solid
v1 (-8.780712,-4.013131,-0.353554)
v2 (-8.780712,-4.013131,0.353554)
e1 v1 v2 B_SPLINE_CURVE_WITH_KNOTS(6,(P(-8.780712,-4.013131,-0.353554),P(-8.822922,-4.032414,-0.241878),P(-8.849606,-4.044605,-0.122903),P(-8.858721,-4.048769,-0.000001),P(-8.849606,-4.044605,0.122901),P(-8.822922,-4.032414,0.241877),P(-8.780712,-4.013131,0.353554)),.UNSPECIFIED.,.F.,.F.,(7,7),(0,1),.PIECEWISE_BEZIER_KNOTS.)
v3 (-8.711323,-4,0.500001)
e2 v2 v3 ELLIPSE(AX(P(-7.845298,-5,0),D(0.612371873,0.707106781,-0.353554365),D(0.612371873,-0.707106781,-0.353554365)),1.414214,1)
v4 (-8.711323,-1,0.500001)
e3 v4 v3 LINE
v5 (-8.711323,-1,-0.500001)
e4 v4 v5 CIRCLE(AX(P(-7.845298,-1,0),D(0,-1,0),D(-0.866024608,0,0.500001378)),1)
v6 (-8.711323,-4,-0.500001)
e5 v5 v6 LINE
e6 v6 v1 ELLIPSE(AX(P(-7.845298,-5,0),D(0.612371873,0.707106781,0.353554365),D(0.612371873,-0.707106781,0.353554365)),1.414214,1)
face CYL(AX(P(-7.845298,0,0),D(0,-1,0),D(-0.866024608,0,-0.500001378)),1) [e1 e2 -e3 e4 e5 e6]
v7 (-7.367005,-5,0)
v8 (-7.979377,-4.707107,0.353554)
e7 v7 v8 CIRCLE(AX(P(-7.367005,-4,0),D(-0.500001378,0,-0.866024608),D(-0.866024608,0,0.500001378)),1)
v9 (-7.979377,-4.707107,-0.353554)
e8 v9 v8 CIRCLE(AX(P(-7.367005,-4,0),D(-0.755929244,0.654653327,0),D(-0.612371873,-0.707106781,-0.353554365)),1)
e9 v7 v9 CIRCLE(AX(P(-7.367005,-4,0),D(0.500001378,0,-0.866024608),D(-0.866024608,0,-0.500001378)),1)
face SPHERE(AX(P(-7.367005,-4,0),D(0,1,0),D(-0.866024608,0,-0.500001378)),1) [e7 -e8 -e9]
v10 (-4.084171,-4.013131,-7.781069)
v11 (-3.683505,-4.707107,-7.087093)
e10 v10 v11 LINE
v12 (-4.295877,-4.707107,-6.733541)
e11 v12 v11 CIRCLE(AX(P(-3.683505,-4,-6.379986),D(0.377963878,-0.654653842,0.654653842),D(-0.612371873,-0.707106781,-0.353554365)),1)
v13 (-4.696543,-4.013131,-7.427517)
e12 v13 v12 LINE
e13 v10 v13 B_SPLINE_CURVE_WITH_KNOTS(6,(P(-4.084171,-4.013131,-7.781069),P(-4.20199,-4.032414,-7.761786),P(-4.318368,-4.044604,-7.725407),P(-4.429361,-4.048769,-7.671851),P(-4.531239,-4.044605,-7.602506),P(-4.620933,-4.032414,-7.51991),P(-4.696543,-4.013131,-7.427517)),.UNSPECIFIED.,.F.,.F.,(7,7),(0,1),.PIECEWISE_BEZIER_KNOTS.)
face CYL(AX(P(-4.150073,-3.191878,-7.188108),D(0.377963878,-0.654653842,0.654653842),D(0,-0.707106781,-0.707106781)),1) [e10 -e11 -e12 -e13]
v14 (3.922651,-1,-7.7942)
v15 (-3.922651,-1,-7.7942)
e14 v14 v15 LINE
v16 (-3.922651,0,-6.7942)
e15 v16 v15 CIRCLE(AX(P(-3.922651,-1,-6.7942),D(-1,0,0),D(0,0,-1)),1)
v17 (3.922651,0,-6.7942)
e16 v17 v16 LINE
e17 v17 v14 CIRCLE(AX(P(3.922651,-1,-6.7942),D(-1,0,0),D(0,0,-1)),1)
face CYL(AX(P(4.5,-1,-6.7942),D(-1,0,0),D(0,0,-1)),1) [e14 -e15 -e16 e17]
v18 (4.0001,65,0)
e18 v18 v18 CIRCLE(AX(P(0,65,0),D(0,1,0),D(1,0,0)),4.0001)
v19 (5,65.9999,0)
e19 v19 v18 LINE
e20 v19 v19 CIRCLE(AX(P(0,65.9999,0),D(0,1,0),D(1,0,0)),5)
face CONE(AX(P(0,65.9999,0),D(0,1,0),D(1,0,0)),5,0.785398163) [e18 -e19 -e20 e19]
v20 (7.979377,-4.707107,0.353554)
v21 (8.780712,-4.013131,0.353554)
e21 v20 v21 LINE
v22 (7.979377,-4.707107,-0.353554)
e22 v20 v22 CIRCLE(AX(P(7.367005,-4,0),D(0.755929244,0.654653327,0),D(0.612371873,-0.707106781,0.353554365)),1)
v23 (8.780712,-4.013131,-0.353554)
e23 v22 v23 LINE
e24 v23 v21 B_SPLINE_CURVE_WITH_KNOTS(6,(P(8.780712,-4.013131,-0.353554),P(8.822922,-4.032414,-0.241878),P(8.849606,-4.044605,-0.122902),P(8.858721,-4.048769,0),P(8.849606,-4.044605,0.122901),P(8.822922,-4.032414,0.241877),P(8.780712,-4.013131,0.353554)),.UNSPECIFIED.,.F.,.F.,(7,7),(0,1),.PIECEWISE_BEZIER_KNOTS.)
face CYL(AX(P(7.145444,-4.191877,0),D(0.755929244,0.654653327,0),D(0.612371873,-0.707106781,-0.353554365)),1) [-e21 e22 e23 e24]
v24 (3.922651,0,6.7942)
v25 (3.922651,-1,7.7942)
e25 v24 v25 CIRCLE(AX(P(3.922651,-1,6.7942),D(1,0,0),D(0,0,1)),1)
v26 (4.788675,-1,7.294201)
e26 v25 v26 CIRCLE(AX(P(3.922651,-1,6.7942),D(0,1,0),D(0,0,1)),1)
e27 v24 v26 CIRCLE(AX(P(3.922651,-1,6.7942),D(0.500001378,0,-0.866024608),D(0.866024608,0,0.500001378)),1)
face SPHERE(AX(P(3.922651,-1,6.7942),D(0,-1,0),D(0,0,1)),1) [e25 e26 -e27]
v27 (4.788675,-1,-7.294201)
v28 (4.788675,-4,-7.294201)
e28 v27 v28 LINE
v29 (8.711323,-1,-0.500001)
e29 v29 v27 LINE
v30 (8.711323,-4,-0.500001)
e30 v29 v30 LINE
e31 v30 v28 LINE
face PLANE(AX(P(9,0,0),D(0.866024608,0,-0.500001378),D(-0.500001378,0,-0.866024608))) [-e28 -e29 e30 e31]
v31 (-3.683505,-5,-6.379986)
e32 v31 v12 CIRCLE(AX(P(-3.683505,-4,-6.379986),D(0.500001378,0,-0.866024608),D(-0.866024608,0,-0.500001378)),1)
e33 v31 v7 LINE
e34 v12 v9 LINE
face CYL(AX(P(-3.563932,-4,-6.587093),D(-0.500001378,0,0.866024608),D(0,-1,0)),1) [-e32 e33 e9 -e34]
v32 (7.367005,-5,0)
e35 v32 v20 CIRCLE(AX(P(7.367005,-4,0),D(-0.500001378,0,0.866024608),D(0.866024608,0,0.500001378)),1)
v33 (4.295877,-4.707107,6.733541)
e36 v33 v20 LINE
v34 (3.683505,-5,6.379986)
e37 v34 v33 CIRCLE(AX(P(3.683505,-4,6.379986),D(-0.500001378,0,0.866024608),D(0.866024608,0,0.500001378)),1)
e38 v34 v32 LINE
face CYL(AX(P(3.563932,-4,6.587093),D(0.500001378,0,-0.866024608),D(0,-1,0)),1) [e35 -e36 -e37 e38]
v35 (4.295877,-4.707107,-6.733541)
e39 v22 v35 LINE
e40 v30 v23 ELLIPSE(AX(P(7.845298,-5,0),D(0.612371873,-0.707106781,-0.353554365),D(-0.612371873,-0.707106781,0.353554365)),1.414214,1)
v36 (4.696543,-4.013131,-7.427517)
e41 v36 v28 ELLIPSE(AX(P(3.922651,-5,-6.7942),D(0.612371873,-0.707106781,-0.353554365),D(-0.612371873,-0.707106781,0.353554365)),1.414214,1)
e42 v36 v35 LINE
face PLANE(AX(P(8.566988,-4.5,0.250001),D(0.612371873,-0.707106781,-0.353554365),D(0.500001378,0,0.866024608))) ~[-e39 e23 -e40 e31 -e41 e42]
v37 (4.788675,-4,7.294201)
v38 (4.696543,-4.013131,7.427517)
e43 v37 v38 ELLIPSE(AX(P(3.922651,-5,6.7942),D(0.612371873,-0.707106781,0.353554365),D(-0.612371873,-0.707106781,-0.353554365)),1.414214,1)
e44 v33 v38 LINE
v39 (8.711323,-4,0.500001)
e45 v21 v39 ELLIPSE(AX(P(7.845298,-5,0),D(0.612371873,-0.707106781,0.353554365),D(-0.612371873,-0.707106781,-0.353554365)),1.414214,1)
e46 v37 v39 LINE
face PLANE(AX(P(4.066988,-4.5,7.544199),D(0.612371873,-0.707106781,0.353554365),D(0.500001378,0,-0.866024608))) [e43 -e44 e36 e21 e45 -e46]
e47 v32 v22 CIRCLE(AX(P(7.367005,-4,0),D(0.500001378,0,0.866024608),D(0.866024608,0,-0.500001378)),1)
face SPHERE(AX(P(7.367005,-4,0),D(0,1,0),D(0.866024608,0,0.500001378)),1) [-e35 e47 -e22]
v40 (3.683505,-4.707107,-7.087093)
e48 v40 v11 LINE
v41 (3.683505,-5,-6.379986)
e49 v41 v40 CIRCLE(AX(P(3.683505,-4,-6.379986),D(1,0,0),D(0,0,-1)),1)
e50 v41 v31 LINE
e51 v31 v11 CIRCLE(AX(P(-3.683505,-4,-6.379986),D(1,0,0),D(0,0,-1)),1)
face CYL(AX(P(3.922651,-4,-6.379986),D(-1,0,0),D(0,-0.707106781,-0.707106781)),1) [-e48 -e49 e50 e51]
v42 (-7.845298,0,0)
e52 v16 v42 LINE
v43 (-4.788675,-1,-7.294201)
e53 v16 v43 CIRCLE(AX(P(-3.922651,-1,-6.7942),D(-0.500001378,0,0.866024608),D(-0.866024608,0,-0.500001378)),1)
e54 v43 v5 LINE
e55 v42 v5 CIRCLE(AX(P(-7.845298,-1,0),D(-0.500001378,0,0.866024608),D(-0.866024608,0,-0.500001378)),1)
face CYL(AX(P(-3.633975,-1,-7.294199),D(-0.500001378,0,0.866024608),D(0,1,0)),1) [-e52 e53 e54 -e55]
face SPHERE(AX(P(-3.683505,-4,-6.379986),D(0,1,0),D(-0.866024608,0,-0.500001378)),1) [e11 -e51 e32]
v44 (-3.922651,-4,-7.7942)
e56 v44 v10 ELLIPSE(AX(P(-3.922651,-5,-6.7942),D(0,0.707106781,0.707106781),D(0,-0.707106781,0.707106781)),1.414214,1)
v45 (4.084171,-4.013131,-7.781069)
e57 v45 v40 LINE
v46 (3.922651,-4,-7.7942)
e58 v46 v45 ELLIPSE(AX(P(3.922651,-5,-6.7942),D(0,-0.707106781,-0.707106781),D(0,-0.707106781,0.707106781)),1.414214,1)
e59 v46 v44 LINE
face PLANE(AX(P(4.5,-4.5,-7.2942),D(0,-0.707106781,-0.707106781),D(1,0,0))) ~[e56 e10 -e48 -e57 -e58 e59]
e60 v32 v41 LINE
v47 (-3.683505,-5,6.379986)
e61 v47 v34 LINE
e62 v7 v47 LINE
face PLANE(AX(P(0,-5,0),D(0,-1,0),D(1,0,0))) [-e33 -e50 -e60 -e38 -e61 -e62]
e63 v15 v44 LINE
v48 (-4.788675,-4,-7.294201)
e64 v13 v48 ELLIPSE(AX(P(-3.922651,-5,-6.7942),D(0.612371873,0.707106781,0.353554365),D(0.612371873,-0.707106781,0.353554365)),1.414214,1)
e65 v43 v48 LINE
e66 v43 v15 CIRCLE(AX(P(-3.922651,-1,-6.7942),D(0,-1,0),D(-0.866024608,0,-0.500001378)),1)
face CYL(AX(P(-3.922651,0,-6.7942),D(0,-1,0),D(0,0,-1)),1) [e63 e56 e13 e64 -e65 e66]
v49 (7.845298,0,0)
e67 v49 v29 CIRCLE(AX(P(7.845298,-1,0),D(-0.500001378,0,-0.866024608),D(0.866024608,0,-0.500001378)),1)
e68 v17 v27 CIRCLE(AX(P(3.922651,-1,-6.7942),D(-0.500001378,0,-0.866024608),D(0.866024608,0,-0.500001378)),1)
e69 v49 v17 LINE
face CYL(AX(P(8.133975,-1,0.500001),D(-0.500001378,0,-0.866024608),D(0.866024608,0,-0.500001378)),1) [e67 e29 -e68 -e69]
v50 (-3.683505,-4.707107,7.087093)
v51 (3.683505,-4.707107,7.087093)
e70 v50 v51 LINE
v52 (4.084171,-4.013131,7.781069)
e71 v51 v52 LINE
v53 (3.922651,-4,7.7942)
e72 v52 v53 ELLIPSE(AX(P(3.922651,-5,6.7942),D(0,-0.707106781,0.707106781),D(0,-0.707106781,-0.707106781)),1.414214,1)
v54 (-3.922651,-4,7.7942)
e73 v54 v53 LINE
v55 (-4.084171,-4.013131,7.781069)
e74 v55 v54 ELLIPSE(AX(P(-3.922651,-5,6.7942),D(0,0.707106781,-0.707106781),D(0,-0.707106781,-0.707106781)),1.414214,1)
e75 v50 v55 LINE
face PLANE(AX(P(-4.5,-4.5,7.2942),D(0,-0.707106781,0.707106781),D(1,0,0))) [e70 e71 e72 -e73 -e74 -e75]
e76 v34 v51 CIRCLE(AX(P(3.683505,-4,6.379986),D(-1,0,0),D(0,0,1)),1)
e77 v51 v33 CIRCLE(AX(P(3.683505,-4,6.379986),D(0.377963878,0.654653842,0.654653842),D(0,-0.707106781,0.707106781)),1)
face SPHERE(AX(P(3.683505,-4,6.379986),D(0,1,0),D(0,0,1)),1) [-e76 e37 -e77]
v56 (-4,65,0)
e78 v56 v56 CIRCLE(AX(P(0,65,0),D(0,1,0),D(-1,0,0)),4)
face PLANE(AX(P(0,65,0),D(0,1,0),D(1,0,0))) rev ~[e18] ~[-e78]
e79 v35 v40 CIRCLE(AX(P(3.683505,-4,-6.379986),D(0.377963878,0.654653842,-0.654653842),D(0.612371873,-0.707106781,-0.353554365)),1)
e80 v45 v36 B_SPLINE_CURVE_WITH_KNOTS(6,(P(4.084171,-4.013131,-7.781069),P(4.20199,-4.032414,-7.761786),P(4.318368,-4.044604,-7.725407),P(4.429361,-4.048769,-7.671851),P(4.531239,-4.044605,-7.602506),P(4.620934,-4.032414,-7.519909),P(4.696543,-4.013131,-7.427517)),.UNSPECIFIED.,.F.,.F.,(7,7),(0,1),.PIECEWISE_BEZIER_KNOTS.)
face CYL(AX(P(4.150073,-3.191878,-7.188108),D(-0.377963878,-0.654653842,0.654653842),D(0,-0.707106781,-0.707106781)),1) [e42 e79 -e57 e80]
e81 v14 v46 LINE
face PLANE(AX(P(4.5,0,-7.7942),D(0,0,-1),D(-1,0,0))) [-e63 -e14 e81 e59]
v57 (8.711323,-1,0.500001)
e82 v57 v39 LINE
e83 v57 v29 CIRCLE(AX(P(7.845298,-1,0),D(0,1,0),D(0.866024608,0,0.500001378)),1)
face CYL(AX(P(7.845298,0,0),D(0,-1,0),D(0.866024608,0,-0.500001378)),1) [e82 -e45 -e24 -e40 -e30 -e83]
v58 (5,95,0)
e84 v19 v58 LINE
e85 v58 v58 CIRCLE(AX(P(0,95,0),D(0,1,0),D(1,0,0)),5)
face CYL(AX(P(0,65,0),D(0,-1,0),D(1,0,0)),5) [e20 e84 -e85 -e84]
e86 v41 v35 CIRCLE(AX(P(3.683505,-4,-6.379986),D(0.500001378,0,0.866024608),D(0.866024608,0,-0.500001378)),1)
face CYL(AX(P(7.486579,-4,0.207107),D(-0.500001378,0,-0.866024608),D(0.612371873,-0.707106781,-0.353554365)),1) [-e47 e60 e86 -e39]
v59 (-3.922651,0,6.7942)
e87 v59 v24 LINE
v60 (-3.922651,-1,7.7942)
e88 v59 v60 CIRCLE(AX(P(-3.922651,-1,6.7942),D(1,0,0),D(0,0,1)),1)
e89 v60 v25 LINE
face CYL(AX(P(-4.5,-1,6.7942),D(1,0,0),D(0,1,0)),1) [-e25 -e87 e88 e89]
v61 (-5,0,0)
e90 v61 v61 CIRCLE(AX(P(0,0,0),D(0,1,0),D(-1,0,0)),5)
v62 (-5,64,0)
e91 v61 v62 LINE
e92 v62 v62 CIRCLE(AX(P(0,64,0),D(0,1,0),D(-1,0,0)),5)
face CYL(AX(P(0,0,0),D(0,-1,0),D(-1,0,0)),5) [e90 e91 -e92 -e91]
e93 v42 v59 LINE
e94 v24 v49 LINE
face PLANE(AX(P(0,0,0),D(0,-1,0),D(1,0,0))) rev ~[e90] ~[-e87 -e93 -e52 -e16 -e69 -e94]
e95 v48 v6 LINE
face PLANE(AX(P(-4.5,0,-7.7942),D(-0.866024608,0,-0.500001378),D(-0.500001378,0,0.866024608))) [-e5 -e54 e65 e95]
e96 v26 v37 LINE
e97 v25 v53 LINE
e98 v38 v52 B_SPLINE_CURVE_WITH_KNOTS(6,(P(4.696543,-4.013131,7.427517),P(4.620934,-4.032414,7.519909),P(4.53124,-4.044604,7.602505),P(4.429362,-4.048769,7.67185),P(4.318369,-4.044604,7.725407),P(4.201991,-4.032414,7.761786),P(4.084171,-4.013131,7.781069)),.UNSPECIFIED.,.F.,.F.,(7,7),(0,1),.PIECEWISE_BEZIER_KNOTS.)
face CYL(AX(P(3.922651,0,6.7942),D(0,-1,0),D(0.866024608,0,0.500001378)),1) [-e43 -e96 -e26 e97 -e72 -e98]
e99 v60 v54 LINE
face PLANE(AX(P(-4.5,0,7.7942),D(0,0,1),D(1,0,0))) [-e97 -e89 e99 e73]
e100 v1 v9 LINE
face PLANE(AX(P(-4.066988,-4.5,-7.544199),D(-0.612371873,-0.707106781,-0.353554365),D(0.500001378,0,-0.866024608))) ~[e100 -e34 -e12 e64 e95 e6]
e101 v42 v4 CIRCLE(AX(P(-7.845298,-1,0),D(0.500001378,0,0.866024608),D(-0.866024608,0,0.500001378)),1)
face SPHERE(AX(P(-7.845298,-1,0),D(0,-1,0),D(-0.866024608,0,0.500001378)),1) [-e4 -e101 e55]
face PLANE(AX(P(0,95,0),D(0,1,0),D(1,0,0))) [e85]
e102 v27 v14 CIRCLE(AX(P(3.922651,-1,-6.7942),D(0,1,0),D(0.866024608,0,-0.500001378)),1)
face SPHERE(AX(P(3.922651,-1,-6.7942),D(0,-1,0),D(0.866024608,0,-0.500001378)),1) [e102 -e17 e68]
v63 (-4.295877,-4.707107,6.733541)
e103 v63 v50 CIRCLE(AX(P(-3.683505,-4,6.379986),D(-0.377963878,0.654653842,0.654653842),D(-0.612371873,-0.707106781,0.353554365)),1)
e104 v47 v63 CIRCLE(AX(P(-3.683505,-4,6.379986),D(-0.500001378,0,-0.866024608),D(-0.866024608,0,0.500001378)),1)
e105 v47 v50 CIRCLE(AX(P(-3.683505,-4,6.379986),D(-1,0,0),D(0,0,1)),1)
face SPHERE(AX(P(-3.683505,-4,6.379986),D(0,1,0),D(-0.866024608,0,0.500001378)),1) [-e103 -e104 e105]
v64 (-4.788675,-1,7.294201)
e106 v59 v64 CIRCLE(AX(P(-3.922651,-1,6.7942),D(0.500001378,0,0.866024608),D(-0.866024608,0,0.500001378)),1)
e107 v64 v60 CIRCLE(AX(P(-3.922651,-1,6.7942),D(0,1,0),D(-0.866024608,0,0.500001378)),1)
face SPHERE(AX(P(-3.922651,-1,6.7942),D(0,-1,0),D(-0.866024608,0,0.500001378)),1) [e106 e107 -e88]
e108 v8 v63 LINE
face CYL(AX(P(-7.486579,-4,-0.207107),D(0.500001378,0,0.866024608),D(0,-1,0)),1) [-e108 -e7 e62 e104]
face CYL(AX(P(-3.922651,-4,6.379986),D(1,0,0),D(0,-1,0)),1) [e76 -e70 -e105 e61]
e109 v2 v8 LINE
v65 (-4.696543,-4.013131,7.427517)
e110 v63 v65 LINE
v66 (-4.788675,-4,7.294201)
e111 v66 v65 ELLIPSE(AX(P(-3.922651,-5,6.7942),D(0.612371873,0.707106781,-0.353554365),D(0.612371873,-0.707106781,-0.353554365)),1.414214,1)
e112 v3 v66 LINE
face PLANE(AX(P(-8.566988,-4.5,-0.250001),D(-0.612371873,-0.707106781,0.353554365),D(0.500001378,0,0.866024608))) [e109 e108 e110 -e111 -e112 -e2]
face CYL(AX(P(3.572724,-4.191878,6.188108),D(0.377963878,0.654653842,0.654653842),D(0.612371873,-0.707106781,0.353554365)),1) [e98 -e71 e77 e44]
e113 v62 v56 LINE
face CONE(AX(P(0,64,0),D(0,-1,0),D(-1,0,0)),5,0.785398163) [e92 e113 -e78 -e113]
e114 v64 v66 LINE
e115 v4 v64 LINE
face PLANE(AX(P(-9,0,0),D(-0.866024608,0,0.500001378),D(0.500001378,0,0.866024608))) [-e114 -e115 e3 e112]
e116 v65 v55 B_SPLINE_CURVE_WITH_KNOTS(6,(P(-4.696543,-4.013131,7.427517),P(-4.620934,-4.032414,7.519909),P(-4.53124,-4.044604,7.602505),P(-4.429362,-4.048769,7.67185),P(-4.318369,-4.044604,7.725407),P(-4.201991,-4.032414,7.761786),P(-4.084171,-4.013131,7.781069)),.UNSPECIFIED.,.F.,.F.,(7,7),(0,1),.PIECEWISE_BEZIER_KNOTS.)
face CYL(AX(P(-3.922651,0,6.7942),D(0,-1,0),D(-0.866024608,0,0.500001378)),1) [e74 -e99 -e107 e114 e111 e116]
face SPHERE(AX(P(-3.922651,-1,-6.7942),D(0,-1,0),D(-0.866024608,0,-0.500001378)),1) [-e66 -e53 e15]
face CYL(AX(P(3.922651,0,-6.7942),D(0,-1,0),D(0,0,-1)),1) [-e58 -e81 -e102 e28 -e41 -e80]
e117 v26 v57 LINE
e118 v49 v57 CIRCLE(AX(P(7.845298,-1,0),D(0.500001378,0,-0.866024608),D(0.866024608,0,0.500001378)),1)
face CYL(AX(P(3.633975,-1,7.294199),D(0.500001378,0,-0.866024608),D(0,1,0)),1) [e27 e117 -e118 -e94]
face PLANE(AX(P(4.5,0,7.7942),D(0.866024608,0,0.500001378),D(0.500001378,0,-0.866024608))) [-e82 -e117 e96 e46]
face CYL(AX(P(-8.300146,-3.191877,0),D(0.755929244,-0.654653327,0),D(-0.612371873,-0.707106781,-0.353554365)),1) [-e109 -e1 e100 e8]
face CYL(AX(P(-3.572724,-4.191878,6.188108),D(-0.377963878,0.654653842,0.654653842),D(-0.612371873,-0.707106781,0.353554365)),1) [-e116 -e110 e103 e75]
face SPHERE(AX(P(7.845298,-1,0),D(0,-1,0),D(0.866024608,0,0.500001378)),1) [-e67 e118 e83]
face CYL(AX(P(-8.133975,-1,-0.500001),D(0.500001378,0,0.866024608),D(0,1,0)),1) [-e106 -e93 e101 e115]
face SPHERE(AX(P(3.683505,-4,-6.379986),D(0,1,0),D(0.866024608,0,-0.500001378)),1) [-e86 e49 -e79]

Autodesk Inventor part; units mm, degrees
ref_plane "YZ Plane" through (0, 0, 0) normal (1, 0, 0) x (0, 1, 0)
ref_plane "XZ Plane" through (0, 0, 0) normal (0, 1, 0) x (-1, 0, 0)
ref_plane "XY Plane" through (0, 0, 0) normal (0, 0, 1) x (1, 0, 0)
sketch "Sketch1" plane through (0, 0, 0) normal (0, 1, 0) x (-1, 0, 0)
  circle A0 centre (0, 0) radius 5
  dimension "d0" = 10
extrude "Extrusion1" add sketch "Sketch1" along normal blind 65
sketch "Sketch2" plane through (0, 65, 0) normal (0, 1, 0) x (1, 0, 0)
  circle A0 centre (0, 0) radius 5 projected
  dimension "d38" = 10
chamfer "Chamfer1" distance 1 angle 45 1 edges at (5, 65, 0)
extrude "Extrusion2" add sketch "Sketch2" along normal blind 30
chamfer "Chamfer2" distance 1 angle 45 1 edges at (-5, 65, 0)
sketch "Sketch3" plane through (0, 0, 0) normal (0, -1, 0) x (1, 0, 0)
  line L0 (0, 0) -> (0, 0) construction
  line L1 (4.5, -7.7942) -> (-4.5, -7.7942)
  line L2 (-4.5, -7.7942) -> (-9, 0)
  line L3 (-9, 0) -> (-4.5, 7.7942)
  line L4 (-4.5, 7.7942) -> (4.5, 7.7942)
  line L5 (4.5, 7.7942) -> (9, 0)
  line L6 (9, 0) -> (4.5, -7.7942)
  circle A0 centre (0, 0) radius 5 projected
  line L7 (-4.5, -7.7942) -> (4.5, 7.7942) construction
  line L8 (-4.5, 7.7942) -> (4.5, -7.7942) construction
  dimension "d21" = 9
  dimension "d22" = 9
  dimension "d23" = 120
  dimension "d24" = 9
  dimension "d25" = 9
  dimension "d26" = 120
  dimension "d34" = 9
  dimension "d36" = 0
  dimension "d37" = 0
extrude "Extrusion3" add sketch "Sketch3" along normal blind 5 contours L1 L2 L3 L4 L5 L6 | A0
chamfer "Chamfer3" distance 1 angle 45 6 edges at (0, -5, -7.7942) (-6.75, -5, -3.8971) (-6.75, -5, 3.8971) (0, -5, 7.7942) (6.75, -5, 3.8971) (6.75, -5, -3.8971)
fillet "Fillet1" radius 1 12 edges at (-4.2113, -4.5, -7.2942) (4.2113, -4.5, -7.2942) (8.4226, -4.5, 0) (4.2113, -4.5, 7.2942) (-4.2113, -4.5, 7.2942) (-8.4226, -4.5, 0) (-5.884, -5, -3.3971) (-5.884, -5, 3.3971) (0, -5, 6.7942) (5.884, -5, 3.3971) (5.884, -5, -3.3971) (0, -5, -6.7942)
fillet "Fillet2" radius 1 12 edges at (4.5, -1.9543, -7.7942) (9, -1.9543, 0) (4.5, -1.9543, 7.7942) (-4.5, -1.9543, 7.7942) (-9, -1.9543, 0) (-4.5, -1.9543, -7.7942) (-6.75, 0, 3.8971) (-6.75, 0, -3.8971) (0, 0, 7.7942) (6.75, 0, 3.8971) (6.75, 0, -3.8971) (0, 0, -7.7942)
thread "Thread3" size "7/16-14 UNC" class "2A" standard "ANSI Unified Screw Threads" full length
equation "\"d21\" = d24"
equation "\"d22\" = d24"
equation "\"d25\" = d24"
properties part number "CIM Mount Bolt" material "Aluminum 6061-AHC"
